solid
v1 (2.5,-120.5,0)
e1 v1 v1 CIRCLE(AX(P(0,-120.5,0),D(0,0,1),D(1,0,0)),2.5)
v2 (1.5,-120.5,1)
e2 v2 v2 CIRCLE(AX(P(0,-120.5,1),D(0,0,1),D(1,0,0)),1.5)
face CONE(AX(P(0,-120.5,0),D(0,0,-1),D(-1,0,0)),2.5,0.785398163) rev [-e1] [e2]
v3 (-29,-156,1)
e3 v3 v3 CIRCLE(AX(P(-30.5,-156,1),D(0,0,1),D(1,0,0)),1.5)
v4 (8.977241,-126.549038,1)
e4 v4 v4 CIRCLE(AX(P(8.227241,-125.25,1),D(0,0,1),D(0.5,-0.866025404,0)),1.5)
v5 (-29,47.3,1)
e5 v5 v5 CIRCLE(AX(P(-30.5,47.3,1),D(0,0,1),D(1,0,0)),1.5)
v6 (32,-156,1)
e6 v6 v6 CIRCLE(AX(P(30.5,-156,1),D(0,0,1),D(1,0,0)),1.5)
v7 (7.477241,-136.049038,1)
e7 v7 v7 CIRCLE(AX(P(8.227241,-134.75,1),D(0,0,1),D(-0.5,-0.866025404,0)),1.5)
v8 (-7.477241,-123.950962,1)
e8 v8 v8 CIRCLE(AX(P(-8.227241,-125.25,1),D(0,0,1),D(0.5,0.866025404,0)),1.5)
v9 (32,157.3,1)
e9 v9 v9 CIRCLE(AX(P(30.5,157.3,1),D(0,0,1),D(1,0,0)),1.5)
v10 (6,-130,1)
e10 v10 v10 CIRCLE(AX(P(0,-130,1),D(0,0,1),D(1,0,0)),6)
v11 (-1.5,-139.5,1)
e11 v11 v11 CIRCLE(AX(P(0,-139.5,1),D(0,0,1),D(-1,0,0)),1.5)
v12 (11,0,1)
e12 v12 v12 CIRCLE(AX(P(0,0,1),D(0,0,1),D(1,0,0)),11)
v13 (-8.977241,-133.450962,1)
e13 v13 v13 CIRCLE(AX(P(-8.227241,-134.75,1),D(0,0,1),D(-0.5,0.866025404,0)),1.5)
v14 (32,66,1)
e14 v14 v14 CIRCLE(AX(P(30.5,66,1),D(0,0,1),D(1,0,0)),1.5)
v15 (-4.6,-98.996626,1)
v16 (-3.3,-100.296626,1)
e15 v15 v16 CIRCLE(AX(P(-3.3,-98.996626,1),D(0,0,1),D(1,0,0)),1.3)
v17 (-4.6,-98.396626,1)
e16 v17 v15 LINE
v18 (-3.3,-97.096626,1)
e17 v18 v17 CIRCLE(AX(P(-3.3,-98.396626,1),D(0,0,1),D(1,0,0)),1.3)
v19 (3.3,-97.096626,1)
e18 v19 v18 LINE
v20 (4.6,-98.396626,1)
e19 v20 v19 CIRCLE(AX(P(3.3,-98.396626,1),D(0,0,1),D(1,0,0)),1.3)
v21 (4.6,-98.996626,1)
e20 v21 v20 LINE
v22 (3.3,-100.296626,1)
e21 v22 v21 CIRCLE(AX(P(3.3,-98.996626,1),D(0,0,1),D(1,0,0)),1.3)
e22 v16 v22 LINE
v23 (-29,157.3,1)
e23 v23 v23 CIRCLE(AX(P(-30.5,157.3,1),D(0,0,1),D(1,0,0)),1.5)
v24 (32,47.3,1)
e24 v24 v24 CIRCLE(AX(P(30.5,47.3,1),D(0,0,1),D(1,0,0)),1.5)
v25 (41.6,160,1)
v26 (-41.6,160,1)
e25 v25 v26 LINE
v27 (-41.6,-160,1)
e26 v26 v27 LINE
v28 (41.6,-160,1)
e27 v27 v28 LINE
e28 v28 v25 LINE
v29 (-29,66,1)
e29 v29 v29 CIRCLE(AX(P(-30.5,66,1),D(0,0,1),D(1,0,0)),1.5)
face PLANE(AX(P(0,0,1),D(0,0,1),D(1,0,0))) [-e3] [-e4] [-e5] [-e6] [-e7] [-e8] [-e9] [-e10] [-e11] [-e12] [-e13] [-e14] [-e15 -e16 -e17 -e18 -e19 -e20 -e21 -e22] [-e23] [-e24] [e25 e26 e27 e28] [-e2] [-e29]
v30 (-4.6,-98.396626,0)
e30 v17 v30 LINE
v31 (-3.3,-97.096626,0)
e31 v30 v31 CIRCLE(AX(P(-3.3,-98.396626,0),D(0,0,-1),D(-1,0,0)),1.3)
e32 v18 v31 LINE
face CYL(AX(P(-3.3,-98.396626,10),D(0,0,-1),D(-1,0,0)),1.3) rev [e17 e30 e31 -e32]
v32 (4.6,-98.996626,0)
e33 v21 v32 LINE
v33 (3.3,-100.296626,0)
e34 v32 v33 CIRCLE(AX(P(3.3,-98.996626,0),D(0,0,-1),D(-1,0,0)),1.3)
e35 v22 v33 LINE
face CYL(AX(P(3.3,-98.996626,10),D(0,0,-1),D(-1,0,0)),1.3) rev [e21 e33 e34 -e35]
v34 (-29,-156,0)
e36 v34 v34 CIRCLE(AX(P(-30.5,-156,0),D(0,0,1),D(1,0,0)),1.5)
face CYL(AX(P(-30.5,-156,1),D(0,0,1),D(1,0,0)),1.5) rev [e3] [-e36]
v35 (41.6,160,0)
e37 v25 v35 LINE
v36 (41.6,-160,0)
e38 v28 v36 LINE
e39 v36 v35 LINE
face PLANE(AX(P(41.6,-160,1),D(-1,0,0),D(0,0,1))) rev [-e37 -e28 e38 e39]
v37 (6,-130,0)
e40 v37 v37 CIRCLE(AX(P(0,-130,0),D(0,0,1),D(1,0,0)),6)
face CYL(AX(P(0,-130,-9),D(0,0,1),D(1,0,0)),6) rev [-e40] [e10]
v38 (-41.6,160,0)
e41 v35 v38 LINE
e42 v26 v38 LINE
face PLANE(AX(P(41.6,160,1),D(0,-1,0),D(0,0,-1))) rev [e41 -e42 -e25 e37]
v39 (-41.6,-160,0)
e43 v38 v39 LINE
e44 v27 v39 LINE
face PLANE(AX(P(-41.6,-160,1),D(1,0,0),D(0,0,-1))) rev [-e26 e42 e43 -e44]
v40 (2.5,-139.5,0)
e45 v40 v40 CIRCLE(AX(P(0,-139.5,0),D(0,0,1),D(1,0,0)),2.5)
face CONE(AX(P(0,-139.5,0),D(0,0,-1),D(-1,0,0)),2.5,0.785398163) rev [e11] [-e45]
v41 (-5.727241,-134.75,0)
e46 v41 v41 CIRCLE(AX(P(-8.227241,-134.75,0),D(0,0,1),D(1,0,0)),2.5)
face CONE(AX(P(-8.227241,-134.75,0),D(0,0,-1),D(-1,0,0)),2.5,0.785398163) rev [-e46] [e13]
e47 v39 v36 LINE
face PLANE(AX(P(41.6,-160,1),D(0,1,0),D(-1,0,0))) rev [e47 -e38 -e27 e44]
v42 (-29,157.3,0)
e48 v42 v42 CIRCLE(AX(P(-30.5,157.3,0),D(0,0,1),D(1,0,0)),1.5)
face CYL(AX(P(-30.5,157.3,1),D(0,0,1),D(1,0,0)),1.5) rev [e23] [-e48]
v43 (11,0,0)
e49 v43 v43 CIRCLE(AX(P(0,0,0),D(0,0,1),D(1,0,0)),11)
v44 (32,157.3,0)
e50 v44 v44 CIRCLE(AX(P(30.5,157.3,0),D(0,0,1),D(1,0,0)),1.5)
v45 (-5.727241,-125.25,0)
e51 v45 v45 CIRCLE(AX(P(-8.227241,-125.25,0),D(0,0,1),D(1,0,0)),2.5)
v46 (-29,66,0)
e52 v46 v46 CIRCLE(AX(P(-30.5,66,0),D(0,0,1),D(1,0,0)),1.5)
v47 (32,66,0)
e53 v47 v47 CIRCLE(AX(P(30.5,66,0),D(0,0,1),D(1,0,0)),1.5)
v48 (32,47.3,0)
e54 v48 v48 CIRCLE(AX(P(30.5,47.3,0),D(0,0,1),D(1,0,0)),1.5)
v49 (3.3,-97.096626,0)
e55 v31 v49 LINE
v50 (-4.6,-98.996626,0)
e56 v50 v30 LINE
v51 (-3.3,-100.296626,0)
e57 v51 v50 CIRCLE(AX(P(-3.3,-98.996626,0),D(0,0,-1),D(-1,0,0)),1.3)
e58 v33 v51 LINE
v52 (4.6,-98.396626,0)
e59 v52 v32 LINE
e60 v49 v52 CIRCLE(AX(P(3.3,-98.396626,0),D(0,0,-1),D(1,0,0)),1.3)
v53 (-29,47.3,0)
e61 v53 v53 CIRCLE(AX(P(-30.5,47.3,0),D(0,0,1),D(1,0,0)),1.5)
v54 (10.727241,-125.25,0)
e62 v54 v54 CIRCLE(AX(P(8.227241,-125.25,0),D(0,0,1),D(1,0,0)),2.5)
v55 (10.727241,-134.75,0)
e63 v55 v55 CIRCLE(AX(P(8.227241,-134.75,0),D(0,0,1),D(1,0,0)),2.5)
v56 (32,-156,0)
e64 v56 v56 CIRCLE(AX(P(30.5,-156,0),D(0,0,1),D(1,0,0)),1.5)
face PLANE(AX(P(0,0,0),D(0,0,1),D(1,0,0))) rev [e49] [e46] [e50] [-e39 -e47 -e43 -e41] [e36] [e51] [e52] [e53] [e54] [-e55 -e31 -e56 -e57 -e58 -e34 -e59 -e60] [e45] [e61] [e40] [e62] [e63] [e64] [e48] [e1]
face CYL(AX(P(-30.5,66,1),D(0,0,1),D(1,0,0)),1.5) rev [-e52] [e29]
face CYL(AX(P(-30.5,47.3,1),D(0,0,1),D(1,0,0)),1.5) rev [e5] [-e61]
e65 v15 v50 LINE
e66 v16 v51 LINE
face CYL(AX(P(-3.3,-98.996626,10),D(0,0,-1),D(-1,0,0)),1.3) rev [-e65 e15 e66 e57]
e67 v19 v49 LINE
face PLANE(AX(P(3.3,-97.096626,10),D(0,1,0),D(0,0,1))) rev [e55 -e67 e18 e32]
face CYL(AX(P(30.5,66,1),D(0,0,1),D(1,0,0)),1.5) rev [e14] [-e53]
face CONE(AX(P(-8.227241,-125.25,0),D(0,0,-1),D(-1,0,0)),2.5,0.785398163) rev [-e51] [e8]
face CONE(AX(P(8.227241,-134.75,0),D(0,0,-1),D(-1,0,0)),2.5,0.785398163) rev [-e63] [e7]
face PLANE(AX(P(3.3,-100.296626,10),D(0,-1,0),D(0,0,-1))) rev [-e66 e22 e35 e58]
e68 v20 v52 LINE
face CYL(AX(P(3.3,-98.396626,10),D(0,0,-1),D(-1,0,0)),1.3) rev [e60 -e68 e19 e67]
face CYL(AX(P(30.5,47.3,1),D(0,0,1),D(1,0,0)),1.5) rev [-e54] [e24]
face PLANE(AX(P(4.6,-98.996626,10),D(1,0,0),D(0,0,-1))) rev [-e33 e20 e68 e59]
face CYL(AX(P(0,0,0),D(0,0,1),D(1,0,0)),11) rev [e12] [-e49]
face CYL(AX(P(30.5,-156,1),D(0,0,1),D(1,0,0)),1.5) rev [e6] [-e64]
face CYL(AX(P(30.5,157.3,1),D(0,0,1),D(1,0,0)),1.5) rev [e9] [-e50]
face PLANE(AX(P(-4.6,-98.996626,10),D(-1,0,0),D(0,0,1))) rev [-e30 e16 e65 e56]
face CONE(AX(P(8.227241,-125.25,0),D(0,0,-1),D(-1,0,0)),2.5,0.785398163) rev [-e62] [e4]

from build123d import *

# Parameters (mm, degrees)
SKETCH1_W                            = 83.2
SKETCH1_H                            = 320
BOSS_EXTRUDE1_DEPTH                  = 1
F_3_0_3_DIAMETER_HOLE1_D             = 3
SKETCH_1_R                           = 11
CUT_EXTRUDE_1_DEPTH                  = 166.322593737
SKETCH_2_R                           = 6
CUT_EXTRUDE_2_DEPTH                  = 10
SKETCH_3_R                           = 1.5
CUT_EXTRUDE_3_DEPTH                  = 10
CHAMFER_1_SIZE                       = 1
PATTERN_CIRCULAR_1_COUNT             = 6
CHAMFER_1_OF_PATTERN_CIRCULAR_1_SIZE = 1
CUT_EXTRUDE_4_DEPTH                  = 10


with BuildPart() as part:
    # Sketch1 → Boss-Extrude1 (new body)
    with BuildSketch(Plane.XY):
        Rectangle(SKETCH1_W, SKETCH1_H)
    extrude(amount=BOSS_EXTRUDE1_DEPTH)

    # Ø3.0 (3) Diameter Hole1 (through all)
    with Locations(Plane.XY.offset(1)):
        with Locations((-30.5, 66), (30.5, 66), (30.5, -156), (-30.5, -156), (-30.5, 157.3), (30.5, 157.3), (-30.5, 47.3), (30.5, 47.3)):
            Hole(F_3_0_3_DIAMETER_HOLE1_D / 2)

    # Эскиз1 → Вырез-Вытянуть1 (cut, through all)
    with BuildSketch(Plane.XY.offset(1)):
        Circle(SKETCH_1_R)
    extrude(amount=-CUT_EXTRUDE_1_DEPTH, mode=Mode.SUBTRACT)

    # Эскиз2 → Вырез-Вытянуть2 (cut)
    with BuildSketch(Plane.XY.offset(1)):
        with Locations((0, -130)):
            Circle(SKETCH_2_R)
    extrude(amount=-CUT_EXTRUDE_2_DEPTH, mode=Mode.SUBTRACT)

    # Эскиз3 → Вырез-Вытянуть3 (cut)
    with BuildSketch(Plane.XY.offset(1)):
        with Locations((0, -120.5)):
            Circle(SKETCH_3_R)
    cut_extrude_3 = extrude(amount=-CUT_EXTRUDE_3_DEPTH, mode=Mode.SUBTRACT)

    # Фаска1
    chamfer_1_edges = [part.edges().sort_by_distance(p)[0] for p in [
        (-1.5, -120.5, 0),
    ]]
    chamfer(chamfer_1_edges, length=CHAMFER_1_SIZE - 0.0001)  # a hair under: the kernel refuses the full size

    # Круговой массив1: Вырез-Вытянуть3 ×6 about axis
    pattern_circular_1_axis = Axis((0, -130, 0), (0, 0, 1))
    for i in range(1, PATTERN_CIRCULAR_1_COUNT):
        add(cut_extrude_3.rotate(pattern_circular_1_axis, i * 360 / PATTERN_CIRCULAR_1_COUNT), mode=Mode.SUBTRACT)

    # Фаска1 of Круговой массив1
    chamfer_1_of_pattern_circular_1_edges = [part.edges().sort_by_distance(p)[0] for p in [
        (-8.977241336, -126.549038106, 0),
        (-7.477241336, -136.049038106, 0),
        (1.5, -139.5, 0),
        (8.977241336, -133.450961894, 0),
        (7.477241336, -123.950961894, 0),
    ]]
    chamfer(chamfer_1_of_pattern_circular_1_edges, length=CHAMFER_1_OF_PATTERN_CIRCULAR_1_SIZE - 0.0001)  # a hair under: the kernel refuses the full size

    # Эскиз4 → Вырез-Вытянуть4 (cut)
    with BuildSketch(Plane(origin=(0, 0, 0), x_dir=(-1, 0, 0), z_dir=(0, 0, -1))):
        with BuildLine():
            Line((-3.3, -100.29662602), (3.3, -100.29662602))
            ThreePointArc((3.3, -100.29662602), (4.219238816, -99.915864836), (4.6, -98.99662602))
            Line((4.6, -98.99662602), (4.6, -98.39662602))
            ThreePointArc((4.6, -98.39662602), (4.219238816, -97.477387205), (3.3, -97.09662602))
            Line((3.3, -97.09662602), (-3.3, -97.09662602))
            ThreePointArc((-3.3, -97.09662602), (-4.219238816, -97.477387205), (-4.6, -98.39662602))
            Line((-4.6, -98.39662602), (-4.6, -98.99662602))
            ThreePointArc((-4.6, -98.99662602), (-4.219238816, -99.915864836), (-3.3, -100.29662602))
        make_face()
    extrude(amount=-CUT_EXTRUDE_4_DEPTH, mode=Mode.SUBTRACT)


solid = part.part
